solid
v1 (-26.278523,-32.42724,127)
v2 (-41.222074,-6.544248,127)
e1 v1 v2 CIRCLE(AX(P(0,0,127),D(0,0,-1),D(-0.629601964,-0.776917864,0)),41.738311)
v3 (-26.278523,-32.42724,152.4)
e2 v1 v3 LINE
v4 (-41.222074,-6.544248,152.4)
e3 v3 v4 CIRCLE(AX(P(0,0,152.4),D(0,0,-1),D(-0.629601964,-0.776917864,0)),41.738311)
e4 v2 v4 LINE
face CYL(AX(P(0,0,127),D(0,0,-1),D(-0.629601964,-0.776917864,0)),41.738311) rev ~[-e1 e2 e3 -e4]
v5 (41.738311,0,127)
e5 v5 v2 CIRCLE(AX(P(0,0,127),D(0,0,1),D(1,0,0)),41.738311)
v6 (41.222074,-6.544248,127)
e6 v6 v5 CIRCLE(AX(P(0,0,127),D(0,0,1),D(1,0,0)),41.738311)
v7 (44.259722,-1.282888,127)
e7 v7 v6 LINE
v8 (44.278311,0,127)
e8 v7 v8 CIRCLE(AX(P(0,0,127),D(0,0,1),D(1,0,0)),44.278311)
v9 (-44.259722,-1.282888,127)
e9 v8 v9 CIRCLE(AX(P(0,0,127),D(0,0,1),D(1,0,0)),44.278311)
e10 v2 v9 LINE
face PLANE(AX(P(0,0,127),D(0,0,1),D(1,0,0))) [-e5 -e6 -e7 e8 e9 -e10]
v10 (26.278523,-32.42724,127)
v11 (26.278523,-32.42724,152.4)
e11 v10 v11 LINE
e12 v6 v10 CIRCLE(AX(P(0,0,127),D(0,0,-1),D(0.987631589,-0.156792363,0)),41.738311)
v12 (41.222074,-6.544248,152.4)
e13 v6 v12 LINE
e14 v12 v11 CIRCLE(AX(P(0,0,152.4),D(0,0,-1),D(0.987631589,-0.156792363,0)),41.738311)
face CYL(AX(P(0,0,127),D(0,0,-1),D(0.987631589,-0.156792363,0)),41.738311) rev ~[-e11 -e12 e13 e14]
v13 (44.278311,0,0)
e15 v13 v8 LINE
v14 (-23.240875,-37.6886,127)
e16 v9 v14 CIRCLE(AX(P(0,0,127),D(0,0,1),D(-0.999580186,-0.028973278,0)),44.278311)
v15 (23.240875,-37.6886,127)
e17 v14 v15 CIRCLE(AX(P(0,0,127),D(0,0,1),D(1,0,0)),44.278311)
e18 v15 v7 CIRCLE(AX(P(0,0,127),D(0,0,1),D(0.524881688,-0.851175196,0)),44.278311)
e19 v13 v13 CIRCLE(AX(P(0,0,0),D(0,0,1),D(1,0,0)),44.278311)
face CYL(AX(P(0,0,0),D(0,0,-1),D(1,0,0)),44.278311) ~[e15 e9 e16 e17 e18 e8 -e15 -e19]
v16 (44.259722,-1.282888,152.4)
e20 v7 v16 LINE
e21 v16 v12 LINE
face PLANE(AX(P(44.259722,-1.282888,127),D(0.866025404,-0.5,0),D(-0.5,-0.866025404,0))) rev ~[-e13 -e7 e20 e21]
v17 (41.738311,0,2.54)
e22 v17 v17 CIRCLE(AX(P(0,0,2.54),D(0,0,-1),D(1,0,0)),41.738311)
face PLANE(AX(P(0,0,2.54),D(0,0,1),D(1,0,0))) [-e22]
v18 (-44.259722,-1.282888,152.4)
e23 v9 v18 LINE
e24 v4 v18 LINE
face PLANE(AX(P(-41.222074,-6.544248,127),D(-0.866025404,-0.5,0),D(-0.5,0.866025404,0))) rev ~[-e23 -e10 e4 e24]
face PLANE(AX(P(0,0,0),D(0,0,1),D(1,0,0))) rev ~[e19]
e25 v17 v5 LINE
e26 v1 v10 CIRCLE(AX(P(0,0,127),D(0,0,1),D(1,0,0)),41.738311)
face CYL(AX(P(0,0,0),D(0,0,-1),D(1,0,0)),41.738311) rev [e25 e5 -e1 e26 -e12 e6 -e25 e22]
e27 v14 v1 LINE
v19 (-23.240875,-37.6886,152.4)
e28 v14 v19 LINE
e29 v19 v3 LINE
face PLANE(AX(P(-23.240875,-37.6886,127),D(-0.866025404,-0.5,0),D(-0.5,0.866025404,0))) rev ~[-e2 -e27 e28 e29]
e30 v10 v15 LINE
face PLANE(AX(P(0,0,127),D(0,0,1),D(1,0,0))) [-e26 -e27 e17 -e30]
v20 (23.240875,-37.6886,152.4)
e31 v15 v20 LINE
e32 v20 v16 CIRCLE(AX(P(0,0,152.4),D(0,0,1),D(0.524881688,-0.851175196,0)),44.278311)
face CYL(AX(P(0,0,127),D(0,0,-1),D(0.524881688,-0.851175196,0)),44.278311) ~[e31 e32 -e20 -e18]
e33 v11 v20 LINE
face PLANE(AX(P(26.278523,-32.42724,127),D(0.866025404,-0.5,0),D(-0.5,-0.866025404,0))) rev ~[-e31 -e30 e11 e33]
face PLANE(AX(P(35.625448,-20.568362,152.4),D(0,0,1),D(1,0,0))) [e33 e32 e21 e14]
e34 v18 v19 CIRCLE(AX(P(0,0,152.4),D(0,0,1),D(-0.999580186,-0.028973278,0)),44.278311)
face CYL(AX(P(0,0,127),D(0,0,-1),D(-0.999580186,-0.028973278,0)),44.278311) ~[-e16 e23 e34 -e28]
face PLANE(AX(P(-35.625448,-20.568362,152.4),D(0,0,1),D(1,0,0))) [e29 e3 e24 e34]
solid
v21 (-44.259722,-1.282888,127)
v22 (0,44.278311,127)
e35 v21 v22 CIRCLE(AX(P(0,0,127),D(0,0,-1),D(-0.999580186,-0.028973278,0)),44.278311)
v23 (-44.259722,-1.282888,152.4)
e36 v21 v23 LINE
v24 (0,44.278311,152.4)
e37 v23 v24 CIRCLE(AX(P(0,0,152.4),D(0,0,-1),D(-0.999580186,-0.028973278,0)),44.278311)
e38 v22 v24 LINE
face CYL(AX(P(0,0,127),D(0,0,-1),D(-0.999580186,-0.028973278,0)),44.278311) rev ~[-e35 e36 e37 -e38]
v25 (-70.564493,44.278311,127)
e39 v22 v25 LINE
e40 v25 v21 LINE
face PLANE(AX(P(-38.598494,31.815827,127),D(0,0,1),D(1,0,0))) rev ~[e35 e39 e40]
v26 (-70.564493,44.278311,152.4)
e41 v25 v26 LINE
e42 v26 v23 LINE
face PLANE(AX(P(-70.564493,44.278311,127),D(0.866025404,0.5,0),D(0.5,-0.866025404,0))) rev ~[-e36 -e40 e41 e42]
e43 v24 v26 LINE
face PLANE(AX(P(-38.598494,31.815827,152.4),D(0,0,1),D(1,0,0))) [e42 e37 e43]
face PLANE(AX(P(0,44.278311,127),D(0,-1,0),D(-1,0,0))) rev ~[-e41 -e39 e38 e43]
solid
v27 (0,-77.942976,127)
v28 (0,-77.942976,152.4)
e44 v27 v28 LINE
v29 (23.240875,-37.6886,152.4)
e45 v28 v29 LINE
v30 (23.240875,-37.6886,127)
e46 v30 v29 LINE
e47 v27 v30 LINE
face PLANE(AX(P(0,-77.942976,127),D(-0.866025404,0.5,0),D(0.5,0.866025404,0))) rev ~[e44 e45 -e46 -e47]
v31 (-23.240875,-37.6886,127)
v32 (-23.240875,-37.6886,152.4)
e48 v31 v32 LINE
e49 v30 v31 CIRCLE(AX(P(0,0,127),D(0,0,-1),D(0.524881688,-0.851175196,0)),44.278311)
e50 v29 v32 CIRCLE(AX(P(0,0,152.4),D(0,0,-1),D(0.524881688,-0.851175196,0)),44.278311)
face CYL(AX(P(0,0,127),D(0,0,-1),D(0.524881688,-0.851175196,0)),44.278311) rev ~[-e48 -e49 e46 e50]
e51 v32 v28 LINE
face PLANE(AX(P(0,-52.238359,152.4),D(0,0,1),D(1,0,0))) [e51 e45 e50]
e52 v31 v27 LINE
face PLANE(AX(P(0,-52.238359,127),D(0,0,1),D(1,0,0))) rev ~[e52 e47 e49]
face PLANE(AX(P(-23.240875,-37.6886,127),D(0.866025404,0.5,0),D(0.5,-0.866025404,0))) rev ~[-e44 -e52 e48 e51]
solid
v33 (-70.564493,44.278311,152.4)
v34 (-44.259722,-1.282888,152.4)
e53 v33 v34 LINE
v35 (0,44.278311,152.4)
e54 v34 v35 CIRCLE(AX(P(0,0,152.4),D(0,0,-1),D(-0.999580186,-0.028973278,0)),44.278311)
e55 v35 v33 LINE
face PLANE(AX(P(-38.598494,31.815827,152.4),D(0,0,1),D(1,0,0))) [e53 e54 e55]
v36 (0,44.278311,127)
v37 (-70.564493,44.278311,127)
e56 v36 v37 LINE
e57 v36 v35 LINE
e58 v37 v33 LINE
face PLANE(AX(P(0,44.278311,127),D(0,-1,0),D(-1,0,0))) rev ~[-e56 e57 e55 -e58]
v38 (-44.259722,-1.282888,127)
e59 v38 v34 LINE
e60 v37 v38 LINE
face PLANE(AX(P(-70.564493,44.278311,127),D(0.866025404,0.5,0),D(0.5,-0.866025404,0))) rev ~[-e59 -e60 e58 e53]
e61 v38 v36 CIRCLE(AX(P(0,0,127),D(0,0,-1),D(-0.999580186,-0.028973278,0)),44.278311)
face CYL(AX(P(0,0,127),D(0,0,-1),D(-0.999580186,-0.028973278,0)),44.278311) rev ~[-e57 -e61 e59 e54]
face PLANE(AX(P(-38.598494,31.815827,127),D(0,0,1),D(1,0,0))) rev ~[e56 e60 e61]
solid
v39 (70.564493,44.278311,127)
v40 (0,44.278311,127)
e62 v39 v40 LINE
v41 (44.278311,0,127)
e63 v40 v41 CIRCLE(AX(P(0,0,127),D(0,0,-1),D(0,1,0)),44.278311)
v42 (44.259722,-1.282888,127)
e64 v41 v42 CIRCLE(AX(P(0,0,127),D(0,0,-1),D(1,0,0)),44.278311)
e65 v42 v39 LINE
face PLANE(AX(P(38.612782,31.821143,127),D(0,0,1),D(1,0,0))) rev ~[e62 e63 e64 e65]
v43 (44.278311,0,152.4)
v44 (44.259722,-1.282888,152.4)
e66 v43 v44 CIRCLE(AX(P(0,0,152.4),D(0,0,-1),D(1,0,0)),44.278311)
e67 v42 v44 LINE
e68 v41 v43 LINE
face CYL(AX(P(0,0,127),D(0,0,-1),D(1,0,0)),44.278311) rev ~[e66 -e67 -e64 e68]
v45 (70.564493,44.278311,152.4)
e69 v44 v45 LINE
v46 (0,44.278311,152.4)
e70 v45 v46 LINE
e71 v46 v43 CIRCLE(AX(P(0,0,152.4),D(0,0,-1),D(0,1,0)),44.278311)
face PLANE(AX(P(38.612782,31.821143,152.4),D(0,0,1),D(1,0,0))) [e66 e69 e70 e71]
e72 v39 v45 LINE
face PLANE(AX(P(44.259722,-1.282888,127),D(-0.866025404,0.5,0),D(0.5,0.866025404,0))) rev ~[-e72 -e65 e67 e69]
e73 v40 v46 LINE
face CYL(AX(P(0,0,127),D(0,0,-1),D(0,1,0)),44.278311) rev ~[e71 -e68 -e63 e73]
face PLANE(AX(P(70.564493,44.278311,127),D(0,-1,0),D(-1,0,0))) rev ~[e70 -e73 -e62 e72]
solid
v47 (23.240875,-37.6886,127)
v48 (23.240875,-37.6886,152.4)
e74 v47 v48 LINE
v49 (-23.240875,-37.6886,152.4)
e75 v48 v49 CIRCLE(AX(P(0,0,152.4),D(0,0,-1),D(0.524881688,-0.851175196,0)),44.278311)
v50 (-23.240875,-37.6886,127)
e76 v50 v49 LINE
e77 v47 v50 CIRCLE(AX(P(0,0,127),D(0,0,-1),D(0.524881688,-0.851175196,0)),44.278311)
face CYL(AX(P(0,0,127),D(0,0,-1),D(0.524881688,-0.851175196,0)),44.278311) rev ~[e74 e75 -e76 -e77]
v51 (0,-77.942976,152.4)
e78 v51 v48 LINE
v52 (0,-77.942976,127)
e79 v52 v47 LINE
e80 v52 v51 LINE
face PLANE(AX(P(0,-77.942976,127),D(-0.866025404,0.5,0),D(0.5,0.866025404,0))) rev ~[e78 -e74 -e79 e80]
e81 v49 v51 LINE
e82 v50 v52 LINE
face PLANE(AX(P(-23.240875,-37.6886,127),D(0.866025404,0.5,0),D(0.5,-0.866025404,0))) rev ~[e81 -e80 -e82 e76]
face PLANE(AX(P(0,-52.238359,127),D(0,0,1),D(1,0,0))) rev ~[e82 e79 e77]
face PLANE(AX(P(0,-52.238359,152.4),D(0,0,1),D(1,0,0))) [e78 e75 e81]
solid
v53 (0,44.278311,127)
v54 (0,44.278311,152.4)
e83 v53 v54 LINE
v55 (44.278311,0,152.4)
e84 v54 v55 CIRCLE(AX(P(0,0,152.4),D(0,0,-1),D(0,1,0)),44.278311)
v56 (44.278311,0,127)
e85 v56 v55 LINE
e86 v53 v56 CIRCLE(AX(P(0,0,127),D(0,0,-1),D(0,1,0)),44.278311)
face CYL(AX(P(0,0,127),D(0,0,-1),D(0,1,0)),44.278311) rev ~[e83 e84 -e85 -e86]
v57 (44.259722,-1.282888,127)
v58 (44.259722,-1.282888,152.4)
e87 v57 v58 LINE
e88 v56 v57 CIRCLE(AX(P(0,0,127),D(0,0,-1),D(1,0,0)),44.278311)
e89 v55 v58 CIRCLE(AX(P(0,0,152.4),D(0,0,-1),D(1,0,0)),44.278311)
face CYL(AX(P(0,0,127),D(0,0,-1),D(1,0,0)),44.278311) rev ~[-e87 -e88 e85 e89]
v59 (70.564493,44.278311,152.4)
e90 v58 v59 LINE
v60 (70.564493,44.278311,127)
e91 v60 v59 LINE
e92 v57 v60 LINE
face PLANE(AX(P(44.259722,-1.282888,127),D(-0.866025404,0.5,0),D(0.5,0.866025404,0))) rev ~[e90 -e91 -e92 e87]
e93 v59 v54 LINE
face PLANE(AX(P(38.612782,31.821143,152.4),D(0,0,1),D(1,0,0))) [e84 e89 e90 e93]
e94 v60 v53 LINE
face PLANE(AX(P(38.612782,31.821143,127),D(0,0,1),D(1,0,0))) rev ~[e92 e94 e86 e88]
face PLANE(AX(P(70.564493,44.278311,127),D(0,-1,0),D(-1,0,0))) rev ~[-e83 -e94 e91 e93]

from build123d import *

# Parameters (mm, degrees)
F0_R     = 44.2783110884
F1_DEPTH = 127
F2_T     = -2.54
F4_DEPTH = 25.4
F5_DEPTH = 25.4


# Not quite as in the source:
# - after a boolean that leaves OpenCascade's solid faulty, fix() repairs it


with BuildPart() as f1:
    # F0 (on Top) → F1 (new body)
    with BuildSketch(Plane.XY):
        Circle(F0_R)
    extrude(amount=F1_DEPTH)

    # F2
    f2_openings = [f1.faces().sort_by_distance(p)[0] for p in [
        (0, 0, 127),
    ]]
    offset(amount=F2_T, openings=f2_openings)

    # F3 (on face) → F4, piece 4 (join)
    with BuildSketch(Plane.XY.offset(127)):
        with BuildLine():
            Line((-41.2220744903, -6.5442484079), (-44.2597224544, -1.2828877987))
            ThreePointArc((-44.2597224543, -1.2828877987), (-38.3461422392, -22.1391555442), (-23.2408746511, -37.6886001106))
            Line((-23.2408746511, -37.6886001106), (-26.2785226151, -32.4272395014))
            ThreePointArc((-26.2785226151, -32.4272395014), (-36.1464377136, -20.8691555442), (-41.2220744903, -6.5442484079))
        make_face()
        with BuildLine():
            ThreePointArc((23.2408746511, -37.6886001106), (38.3461422392, -22.1391555442), (44.2597224543, -1.2828877987))
            Line((44.2597224544, -1.2828877987), (41.2220744903, -6.5442484079))
            ThreePointArc((41.2220744903, -6.5442484079), (36.1464377136, -20.8691555442), (26.2785226151, -32.4272395014))
            Line((26.2785226151, -32.4272395014), (23.2408746511, -37.6886001106))
        make_face()
    extrude(amount=F4_DEPTH)

    add(f1.part.fix(), mode=Mode.REPLACE)


with BuildPart() as f4:
    # F3 (on face) → F4 (new body)
    with BuildSketch(Plane.XY.offset(127)):
        with BuildLine():
            Line((-1.56e-08, 44.2783110884), (-70.5644928964, 44.2783110884))
            Line((-70.5644928964, 44.2783110884), (-44.2597224544, -1.2828877987))
            ThreePointArc((-44.2597224543, -1.2828877987), (-31.7598247679, 30.8525908726), (-1.56e-08, 44.2783110884))
        make_face()
    extrude(amount=F4_DEPTH)


with BuildPart() as f4b:
    # F3 (on face) → F4, piece 2 (new body)
    with BuildSketch(Plane.XY.offset(127)):
        with BuildLine():
            Line((70.5644928964, 44.2783110884), (-1.56e-08, 44.2783110884))
            ThreePointArc((-1.56e-08, 44.2783110884), (31.3094940246, 31.3094940356), (44.2783110884, 0))
            ThreePointArc((44.2783110884, 0), (44.273663686, -0.6415112317), (44.2597224543, -1.2828877987))
            Line((44.2597224544, -1.2828877987), (70.5644928964, 44.2783110884))
        make_face()
    extrude(amount=F4_DEPTH)


with BuildPart() as f4c:
    # F3 (on face) → F4, piece 3 (new body)
    with BuildSketch(Plane.XY.offset(127)):
        with BuildLine():
            ThreePointArc((23.2408746511, -37.6886001106), (0, -44.2783110884), (-23.2408746511, -37.6886001106))
            Line((-23.2408746511, -37.6886001106), (0, -77.9429758185))
            Line((0, -77.9429758185), (23.2408746511, -37.6886001106))
        make_face()
    extrude(amount=F4_DEPTH)


with BuildPart() as f5:
    # F3 (on face) → F5 (new body)
    with BuildSketch(Plane.XY.offset(127)):
        with BuildLine():
            Line((70.5644928964, 44.2783110884), (-1.56e-08, 44.2783110884))
            ThreePointArc((-1.56e-08, 44.2783110884), (31.3094940246, 31.3094940356), (44.2783110884, 0))
            ThreePointArc((44.2783110884, 0), (44.273663686, -0.6415112317), (44.2597224543, -1.2828877987))
            Line((44.2597224544, -1.2828877987), (70.5644928964, 44.2783110884))
        make_face()
    extrude(amount=F5_DEPTH)


with BuildPart() as f5b:
    # F3 (on face) → F5, piece 2 (new body)
    with BuildSketch(Plane.XY.offset(127)):
        with BuildLine():
            Line((-1.56e-08, 44.2783110884), (-70.5644928964, 44.2783110884))
            Line((-70.5644928964, 44.2783110884), (-44.2597224544, -1.2828877987))
            ThreePointArc((-44.2597224543, -1.2828877987), (-31.7598247679, 30.8525908726), (-1.56e-08, 44.2783110884))
        make_face()
    extrude(amount=F5_DEPTH)


with BuildPart() as f5c:
    # F3 (on face) → F5, piece 3 (new body)
    with BuildSketch(Plane.XY.offset(127)):
        with BuildLine():
            ThreePointArc((23.2408746511, -37.6886001106), (0, -44.2783110884), (-23.2408746511, -37.6886001106))
            Line((-23.2408746511, -37.6886001106), (0, -77.9429758185))
            Line((0, -77.9429758185), (23.2408746511, -37.6886001106))
        make_face()
    extrude(amount=F5_DEPTH)


solid = Compound([f1.part, f4.part, f4b.part, f4c.part, f5.part, f5b.part, f5c.part])
